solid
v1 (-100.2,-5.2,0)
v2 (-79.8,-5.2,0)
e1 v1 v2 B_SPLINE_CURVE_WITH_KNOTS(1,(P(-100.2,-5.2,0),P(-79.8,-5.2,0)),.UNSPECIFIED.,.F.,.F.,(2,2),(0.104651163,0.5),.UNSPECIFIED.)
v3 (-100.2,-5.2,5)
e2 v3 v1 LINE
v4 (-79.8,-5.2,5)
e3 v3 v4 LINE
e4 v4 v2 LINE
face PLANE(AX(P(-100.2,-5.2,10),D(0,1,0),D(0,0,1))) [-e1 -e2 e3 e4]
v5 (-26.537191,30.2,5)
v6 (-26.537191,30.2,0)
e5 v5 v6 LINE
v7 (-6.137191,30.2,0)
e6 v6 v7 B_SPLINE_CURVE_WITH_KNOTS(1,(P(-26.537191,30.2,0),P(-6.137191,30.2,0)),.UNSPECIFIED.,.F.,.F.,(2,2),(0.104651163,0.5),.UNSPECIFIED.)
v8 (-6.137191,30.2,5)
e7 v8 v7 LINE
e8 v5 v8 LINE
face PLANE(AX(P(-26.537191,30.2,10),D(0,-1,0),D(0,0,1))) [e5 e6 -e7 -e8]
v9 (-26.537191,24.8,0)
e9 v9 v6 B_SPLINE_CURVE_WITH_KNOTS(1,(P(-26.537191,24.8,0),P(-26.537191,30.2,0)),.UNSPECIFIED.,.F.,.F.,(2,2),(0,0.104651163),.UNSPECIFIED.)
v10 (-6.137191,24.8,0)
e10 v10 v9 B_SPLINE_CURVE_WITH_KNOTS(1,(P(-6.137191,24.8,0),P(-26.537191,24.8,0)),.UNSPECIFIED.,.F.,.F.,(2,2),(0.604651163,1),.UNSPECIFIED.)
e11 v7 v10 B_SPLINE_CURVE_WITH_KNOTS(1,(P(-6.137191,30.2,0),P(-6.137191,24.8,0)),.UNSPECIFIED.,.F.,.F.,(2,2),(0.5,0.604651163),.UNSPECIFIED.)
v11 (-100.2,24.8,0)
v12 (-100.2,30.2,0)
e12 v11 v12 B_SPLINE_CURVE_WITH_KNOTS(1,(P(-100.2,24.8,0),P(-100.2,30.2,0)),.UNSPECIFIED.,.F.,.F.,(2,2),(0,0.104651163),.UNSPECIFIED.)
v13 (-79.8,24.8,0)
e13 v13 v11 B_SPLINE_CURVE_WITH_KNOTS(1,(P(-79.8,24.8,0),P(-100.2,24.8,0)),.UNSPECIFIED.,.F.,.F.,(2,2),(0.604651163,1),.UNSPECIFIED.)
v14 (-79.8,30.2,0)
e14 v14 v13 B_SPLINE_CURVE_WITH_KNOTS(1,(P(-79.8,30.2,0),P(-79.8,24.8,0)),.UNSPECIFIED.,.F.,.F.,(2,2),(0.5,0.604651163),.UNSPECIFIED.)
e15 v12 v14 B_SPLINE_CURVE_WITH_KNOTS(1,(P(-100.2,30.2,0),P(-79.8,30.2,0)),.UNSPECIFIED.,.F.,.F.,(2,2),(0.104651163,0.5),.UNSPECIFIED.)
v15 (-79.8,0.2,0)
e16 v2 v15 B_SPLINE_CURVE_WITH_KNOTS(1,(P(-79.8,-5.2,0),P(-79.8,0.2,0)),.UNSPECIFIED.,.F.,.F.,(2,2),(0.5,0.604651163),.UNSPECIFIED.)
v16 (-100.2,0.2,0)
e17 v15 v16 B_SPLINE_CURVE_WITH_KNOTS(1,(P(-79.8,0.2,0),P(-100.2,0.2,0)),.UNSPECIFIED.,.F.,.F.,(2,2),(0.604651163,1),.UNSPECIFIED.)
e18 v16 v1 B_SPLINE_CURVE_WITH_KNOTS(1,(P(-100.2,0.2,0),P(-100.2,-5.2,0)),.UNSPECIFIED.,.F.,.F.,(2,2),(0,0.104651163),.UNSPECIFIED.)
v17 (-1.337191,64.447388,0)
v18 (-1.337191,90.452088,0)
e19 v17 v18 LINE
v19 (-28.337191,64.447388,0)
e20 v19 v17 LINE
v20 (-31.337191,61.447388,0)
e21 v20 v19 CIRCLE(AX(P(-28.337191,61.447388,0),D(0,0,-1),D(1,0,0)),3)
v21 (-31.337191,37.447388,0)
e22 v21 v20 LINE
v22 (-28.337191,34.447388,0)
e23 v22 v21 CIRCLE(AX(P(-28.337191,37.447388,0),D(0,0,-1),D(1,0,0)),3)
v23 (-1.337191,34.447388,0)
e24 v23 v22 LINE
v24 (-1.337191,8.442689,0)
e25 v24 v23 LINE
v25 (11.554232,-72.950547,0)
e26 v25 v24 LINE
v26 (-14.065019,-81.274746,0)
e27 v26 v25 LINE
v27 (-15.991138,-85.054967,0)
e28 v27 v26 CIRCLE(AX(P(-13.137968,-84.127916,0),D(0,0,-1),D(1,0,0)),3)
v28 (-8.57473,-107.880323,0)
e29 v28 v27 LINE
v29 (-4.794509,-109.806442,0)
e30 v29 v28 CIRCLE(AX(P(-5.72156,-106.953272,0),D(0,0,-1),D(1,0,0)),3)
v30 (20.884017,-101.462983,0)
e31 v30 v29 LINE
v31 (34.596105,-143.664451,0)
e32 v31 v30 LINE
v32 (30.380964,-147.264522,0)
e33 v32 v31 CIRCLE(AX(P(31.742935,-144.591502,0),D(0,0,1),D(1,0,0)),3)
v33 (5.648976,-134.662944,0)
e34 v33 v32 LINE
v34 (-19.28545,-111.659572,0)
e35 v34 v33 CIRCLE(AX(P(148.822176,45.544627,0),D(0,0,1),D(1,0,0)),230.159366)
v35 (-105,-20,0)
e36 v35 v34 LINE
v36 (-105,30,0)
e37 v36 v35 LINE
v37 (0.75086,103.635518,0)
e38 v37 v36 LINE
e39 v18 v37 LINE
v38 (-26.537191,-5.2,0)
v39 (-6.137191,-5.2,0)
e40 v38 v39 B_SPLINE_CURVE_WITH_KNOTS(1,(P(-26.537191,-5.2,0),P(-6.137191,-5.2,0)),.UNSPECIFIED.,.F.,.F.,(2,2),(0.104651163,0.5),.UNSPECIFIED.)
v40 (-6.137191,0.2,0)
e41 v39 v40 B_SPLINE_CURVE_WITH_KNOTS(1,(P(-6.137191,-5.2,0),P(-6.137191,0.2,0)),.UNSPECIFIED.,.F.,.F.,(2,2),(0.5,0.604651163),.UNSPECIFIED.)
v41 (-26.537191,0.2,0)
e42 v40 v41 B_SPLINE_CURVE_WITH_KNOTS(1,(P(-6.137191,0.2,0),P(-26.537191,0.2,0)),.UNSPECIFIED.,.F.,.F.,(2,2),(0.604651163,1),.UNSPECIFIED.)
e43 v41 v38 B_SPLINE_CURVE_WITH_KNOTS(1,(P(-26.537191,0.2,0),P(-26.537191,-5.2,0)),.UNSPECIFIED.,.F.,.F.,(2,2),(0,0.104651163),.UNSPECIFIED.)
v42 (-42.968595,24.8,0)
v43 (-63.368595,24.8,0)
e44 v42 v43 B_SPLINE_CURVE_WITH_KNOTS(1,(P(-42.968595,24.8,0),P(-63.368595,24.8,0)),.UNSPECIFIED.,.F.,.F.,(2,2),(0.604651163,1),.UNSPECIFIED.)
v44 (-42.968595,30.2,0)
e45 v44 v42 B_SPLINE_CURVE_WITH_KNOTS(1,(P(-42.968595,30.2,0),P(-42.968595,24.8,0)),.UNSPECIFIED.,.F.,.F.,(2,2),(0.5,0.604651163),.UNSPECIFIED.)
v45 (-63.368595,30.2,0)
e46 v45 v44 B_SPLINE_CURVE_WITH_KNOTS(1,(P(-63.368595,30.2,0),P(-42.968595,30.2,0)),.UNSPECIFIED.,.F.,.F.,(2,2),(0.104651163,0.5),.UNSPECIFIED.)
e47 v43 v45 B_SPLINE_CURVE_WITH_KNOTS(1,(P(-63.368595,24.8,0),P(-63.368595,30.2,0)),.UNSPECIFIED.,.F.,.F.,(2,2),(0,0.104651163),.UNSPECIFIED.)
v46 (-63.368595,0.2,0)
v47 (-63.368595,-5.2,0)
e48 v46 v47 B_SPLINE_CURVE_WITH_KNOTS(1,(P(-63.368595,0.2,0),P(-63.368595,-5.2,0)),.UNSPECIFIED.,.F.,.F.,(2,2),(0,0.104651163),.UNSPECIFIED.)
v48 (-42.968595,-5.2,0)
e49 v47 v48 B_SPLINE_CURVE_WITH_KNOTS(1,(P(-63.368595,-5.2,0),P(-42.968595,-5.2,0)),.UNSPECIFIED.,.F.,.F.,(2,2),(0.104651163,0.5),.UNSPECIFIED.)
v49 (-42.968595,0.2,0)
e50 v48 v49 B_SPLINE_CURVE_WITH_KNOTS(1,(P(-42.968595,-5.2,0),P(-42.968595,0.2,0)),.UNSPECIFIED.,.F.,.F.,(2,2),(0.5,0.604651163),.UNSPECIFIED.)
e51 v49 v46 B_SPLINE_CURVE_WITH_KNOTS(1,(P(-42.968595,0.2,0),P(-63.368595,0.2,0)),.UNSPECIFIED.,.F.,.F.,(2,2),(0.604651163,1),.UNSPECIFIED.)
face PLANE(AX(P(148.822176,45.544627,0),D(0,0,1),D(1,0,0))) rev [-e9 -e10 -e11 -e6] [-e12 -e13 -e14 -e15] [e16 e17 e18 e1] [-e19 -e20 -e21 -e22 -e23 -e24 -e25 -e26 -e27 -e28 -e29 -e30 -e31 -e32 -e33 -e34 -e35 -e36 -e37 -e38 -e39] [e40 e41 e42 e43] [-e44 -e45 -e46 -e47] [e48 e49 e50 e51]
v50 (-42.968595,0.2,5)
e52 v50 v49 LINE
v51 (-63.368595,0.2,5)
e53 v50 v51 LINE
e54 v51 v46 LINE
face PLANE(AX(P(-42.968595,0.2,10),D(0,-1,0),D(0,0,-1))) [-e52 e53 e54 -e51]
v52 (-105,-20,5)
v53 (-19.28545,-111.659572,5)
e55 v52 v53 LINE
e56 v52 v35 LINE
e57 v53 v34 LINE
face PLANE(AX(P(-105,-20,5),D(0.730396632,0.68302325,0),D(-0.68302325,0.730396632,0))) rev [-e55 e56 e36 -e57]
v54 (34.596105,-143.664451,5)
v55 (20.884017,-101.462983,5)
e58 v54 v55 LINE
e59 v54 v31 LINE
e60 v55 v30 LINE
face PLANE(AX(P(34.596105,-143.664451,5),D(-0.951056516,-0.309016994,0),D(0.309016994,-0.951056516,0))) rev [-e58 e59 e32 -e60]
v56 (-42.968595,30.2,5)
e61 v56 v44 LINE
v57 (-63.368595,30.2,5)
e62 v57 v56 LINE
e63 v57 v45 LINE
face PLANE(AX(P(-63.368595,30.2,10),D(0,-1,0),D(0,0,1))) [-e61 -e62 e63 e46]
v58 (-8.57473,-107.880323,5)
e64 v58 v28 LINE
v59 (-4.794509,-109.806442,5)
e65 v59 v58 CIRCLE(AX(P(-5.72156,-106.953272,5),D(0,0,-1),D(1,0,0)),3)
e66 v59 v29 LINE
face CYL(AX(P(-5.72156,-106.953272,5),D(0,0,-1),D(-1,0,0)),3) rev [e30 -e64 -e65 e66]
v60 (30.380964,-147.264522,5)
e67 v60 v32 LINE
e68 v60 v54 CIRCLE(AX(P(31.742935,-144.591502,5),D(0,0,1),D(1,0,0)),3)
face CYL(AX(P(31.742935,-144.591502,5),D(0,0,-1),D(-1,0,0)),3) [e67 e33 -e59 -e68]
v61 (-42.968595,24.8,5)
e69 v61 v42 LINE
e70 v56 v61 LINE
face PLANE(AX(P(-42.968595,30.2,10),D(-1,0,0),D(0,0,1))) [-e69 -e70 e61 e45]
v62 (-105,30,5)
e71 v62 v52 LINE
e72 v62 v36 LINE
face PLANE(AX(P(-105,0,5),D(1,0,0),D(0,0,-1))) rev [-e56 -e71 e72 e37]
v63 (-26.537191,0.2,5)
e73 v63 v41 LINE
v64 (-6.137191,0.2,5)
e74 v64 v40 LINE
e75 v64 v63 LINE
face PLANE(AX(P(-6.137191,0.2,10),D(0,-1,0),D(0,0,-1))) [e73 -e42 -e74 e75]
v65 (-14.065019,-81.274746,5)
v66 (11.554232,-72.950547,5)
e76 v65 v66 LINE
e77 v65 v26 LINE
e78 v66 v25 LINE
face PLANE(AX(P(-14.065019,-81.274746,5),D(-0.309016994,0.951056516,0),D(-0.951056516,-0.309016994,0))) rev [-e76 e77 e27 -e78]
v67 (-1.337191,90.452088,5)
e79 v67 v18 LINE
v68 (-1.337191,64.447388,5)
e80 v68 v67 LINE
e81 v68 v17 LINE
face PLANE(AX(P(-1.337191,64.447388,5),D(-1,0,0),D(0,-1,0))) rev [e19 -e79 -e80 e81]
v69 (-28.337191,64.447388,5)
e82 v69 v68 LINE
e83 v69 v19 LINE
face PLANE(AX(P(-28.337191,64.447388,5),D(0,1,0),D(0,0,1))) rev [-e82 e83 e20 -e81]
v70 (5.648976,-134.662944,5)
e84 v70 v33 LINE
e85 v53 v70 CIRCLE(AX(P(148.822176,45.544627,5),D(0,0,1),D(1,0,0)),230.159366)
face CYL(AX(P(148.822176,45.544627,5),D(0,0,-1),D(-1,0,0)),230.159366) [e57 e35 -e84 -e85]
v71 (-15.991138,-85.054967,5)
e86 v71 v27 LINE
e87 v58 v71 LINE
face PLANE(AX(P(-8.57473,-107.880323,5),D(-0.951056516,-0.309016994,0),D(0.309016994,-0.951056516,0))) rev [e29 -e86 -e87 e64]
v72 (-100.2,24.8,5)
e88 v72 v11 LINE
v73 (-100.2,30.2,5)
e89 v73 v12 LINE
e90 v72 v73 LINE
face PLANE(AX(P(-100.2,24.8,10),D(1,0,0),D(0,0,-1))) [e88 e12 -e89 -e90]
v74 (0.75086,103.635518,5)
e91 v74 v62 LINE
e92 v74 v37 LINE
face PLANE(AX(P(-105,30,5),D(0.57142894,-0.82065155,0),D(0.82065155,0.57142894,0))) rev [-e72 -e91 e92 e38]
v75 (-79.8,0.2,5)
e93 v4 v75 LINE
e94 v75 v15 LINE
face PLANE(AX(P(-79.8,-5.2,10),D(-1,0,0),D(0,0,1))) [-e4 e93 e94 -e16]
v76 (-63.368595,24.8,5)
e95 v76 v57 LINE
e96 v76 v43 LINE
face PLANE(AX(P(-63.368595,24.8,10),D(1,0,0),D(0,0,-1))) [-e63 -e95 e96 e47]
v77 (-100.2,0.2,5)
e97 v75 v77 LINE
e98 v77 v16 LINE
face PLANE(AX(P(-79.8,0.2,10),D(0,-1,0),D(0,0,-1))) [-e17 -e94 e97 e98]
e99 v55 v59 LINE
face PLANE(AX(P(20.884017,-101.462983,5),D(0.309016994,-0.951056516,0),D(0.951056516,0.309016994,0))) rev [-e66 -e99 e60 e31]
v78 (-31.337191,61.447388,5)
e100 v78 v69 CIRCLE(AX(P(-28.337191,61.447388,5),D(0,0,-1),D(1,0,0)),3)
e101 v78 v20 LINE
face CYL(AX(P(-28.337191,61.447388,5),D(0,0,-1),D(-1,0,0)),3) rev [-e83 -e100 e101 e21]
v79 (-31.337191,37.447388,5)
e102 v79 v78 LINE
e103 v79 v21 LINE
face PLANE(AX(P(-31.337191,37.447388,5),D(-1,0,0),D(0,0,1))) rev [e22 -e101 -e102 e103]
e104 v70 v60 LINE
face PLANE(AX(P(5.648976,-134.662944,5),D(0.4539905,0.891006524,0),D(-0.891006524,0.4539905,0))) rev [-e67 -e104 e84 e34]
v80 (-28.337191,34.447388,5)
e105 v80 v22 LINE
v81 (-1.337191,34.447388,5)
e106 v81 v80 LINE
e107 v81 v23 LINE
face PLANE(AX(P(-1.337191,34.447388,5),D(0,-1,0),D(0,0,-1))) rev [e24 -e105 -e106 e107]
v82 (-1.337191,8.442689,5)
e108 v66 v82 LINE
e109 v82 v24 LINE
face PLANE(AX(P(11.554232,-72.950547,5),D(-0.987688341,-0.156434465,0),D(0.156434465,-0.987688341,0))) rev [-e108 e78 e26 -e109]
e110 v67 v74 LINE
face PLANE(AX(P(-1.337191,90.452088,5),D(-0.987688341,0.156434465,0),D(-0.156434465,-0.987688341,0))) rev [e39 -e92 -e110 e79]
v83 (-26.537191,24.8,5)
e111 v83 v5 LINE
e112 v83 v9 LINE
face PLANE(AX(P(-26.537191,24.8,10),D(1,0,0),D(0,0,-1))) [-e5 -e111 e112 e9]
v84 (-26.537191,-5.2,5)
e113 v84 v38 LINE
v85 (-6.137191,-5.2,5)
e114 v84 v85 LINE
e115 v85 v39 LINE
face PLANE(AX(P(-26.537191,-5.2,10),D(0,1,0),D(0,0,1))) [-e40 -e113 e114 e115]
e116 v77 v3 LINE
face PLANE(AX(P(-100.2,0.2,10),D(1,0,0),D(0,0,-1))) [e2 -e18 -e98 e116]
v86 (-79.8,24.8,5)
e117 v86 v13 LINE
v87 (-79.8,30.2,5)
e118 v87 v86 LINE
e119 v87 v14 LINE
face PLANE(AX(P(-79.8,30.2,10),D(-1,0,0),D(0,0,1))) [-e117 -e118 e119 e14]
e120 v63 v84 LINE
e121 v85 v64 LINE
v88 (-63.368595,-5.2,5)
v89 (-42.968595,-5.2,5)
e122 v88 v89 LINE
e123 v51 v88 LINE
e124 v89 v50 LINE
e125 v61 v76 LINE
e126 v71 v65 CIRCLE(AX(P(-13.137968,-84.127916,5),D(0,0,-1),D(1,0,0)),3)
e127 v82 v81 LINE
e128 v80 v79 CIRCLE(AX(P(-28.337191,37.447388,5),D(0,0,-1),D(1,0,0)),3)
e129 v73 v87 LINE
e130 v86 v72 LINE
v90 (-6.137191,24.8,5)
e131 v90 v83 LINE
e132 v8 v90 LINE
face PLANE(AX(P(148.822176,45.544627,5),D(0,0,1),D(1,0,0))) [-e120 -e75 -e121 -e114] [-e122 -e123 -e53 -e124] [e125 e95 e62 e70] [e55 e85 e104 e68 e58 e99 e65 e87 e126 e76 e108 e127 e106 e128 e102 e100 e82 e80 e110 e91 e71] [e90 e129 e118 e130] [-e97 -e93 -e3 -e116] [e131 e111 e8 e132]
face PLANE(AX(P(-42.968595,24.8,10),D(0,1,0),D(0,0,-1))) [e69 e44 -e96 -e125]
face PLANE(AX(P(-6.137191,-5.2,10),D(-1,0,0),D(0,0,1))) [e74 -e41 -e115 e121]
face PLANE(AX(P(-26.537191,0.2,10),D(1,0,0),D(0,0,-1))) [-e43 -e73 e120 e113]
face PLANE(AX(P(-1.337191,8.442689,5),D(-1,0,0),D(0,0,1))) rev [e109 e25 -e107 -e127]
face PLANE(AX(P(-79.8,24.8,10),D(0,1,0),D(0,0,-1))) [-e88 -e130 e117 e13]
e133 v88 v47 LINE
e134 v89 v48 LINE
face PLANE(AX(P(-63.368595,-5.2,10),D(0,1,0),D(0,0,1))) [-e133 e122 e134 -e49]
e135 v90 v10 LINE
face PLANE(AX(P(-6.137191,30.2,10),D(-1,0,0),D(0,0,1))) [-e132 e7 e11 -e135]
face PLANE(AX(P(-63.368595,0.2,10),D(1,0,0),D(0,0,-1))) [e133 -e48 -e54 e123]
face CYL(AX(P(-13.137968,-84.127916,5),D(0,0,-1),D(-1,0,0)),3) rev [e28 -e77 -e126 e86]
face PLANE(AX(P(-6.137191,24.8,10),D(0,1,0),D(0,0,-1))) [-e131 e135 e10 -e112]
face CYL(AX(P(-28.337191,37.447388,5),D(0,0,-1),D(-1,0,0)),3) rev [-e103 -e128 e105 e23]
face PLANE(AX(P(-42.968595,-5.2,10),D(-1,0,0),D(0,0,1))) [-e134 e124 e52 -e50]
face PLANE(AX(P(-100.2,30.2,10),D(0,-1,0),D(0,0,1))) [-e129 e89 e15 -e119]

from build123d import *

# Parameters (mm, degrees)
SM_BASE_FLANGE_1_DEPTH = 5
OTHER_START            = -100.2
OTHER_1_OUTLINE_W      = 5.4
OTHER_1_OUTLINE_H      = 5
OTHER_1_DEPTH          = 20.4
OTHER_START_2          = -63.368595269
OTHER_1_2_OUTLINE_W    = 5.4
OTHER_1_2_OUTLINE_H    = 5
OTHER_1_2_DEPTH        = 20.4
OTHER_START_3          = -26.537190538
OTHER_1_3_OUTLINE_W    = 5.4
OTHER_1_3_OUTLINE_H    = 5
OTHER_1_3_DEPTH        = 20.4


# Read off the part's stored shape, not the designer's step: Выступы и прорези-Прорезь1
# Sheet-metal steps are written as plain solids
with BuildPart() as part:
    # Sketch 1 → Базовая кромка1 (new body)
    with BuildSketch(Plane.XY):
        with BuildLine():
            Line((-105, 0), (-105, 30))
            Line((-105, 30), (0.750859603, 103.635517522))
            Line((0.750859603, 103.635517522), (-1.337190538, 90.452087776))
            Line((-1.337190538, 90.452087776), (-1.337190538, 64.447388282))
            Line((-1.337190538, 64.447388282), (-28.337190538, 64.447388282))
            ThreePointArc((-28.337190538, 64.447388282), (-30.458510882, 63.568708625), (-31.337190538, 61.447388282))
            Line((-31.337190538, 61.447388282), (-31.337190538, 37.447388282))
            ThreePointArc((-31.337190538, 37.447388282), (-30.458510882, 35.326067938), (-28.337190538, 34.447388282))
            Line((-28.337190538, 34.447388282), (-1.337190538, 34.447388282))
            Line((-1.337190538, 34.447388282), (-1.337190538, 8.442688787))
            Line((-1.337190538, 8.442688787), (11.55423155, -72.950546947))
            Line((11.55423155, -72.950546947), (-14.065019195, -81.274746116))
            ThreePointArc((-14.065019195, -81.274746116), (-15.810987784, -82.765944166), (-15.991137761, -85.054966648))
            Line((-15.991137761, -85.054966648), (-8.574729896, -107.88032304))
            ThreePointArc((-8.574729896, -107.88032304), (-7.083531846, -109.626291629), (-4.794509364, -109.806441605))
            Line((-4.794509364, -109.806441605), (20.884016576, -101.462982757))
            Line((20.884016576, -101.462982757), (34.59610485, -143.664451098))
            ThreePointArc((34.59610485, -143.664451098), (33.691279446, -146.872719978), (30.380963802, -147.264521653))
            Line((30.380963802, -147.264521653), (5.64897556, -134.662944227))
            ThreePointArc((5.64897556, -134.662944227), (-7.242640853, -123.621288585), (-19.285450277, -111.659571558))
            Line((-19.285450277, -111.659571558), (-105, -20))
            Line((-105, -20), (-105, 0))
        make_face()
    extrude(amount=SM_BASE_FLANGE_1_DEPTH)

    # Other 1 outline → Other 1 (cut)
    with BuildSketch(Plane.YZ.offset(OTHER_START)):
        with Locations((-2.5, 2.5)):
            Rectangle(OTHER_1_OUTLINE_W, OTHER_1_OUTLINE_H)
    other_1 = extrude(amount=OTHER_1_DEPTH, mode=Mode.SUBTRACT)

    # Other 1 2 outline → Other 1 2 (cut)
    with BuildSketch(Plane.YZ.offset(OTHER_START_2)):
        with Locations((-2.5, 2.5)):
            Rectangle(OTHER_1_2_OUTLINE_W, OTHER_1_2_OUTLINE_H)
    other_1_2 = extrude(amount=OTHER_1_2_DEPTH, mode=Mode.SUBTRACT)

    # Other 1 3 outline → Other 1 3 (cut)
    with BuildSketch(Plane.YZ.offset(OTHER_START_3)):
        with Locations((-2.5, 2.5)):
            Rectangle(OTHER_1_3_OUTLINE_W, OTHER_1_3_OUTLINE_H)
    other_1_3 = extrude(amount=OTHER_1_3_DEPTH, mode=Mode.SUBTRACT)

    # Зеркальное отражение1: Other 1, Other 1 2, Other 1 3 across plane
    add(other_1.mirror(Plane.ZX.offset(12.5)), mode=Mode.SUBTRACT)
    add(other_1_2.mirror(Plane.ZX.offset(12.5)), mode=Mode.SUBTRACT)
    add(other_1_3.mirror(Plane.ZX.offset(12.5)), mode=Mode.SUBTRACT)


solid = part.part
